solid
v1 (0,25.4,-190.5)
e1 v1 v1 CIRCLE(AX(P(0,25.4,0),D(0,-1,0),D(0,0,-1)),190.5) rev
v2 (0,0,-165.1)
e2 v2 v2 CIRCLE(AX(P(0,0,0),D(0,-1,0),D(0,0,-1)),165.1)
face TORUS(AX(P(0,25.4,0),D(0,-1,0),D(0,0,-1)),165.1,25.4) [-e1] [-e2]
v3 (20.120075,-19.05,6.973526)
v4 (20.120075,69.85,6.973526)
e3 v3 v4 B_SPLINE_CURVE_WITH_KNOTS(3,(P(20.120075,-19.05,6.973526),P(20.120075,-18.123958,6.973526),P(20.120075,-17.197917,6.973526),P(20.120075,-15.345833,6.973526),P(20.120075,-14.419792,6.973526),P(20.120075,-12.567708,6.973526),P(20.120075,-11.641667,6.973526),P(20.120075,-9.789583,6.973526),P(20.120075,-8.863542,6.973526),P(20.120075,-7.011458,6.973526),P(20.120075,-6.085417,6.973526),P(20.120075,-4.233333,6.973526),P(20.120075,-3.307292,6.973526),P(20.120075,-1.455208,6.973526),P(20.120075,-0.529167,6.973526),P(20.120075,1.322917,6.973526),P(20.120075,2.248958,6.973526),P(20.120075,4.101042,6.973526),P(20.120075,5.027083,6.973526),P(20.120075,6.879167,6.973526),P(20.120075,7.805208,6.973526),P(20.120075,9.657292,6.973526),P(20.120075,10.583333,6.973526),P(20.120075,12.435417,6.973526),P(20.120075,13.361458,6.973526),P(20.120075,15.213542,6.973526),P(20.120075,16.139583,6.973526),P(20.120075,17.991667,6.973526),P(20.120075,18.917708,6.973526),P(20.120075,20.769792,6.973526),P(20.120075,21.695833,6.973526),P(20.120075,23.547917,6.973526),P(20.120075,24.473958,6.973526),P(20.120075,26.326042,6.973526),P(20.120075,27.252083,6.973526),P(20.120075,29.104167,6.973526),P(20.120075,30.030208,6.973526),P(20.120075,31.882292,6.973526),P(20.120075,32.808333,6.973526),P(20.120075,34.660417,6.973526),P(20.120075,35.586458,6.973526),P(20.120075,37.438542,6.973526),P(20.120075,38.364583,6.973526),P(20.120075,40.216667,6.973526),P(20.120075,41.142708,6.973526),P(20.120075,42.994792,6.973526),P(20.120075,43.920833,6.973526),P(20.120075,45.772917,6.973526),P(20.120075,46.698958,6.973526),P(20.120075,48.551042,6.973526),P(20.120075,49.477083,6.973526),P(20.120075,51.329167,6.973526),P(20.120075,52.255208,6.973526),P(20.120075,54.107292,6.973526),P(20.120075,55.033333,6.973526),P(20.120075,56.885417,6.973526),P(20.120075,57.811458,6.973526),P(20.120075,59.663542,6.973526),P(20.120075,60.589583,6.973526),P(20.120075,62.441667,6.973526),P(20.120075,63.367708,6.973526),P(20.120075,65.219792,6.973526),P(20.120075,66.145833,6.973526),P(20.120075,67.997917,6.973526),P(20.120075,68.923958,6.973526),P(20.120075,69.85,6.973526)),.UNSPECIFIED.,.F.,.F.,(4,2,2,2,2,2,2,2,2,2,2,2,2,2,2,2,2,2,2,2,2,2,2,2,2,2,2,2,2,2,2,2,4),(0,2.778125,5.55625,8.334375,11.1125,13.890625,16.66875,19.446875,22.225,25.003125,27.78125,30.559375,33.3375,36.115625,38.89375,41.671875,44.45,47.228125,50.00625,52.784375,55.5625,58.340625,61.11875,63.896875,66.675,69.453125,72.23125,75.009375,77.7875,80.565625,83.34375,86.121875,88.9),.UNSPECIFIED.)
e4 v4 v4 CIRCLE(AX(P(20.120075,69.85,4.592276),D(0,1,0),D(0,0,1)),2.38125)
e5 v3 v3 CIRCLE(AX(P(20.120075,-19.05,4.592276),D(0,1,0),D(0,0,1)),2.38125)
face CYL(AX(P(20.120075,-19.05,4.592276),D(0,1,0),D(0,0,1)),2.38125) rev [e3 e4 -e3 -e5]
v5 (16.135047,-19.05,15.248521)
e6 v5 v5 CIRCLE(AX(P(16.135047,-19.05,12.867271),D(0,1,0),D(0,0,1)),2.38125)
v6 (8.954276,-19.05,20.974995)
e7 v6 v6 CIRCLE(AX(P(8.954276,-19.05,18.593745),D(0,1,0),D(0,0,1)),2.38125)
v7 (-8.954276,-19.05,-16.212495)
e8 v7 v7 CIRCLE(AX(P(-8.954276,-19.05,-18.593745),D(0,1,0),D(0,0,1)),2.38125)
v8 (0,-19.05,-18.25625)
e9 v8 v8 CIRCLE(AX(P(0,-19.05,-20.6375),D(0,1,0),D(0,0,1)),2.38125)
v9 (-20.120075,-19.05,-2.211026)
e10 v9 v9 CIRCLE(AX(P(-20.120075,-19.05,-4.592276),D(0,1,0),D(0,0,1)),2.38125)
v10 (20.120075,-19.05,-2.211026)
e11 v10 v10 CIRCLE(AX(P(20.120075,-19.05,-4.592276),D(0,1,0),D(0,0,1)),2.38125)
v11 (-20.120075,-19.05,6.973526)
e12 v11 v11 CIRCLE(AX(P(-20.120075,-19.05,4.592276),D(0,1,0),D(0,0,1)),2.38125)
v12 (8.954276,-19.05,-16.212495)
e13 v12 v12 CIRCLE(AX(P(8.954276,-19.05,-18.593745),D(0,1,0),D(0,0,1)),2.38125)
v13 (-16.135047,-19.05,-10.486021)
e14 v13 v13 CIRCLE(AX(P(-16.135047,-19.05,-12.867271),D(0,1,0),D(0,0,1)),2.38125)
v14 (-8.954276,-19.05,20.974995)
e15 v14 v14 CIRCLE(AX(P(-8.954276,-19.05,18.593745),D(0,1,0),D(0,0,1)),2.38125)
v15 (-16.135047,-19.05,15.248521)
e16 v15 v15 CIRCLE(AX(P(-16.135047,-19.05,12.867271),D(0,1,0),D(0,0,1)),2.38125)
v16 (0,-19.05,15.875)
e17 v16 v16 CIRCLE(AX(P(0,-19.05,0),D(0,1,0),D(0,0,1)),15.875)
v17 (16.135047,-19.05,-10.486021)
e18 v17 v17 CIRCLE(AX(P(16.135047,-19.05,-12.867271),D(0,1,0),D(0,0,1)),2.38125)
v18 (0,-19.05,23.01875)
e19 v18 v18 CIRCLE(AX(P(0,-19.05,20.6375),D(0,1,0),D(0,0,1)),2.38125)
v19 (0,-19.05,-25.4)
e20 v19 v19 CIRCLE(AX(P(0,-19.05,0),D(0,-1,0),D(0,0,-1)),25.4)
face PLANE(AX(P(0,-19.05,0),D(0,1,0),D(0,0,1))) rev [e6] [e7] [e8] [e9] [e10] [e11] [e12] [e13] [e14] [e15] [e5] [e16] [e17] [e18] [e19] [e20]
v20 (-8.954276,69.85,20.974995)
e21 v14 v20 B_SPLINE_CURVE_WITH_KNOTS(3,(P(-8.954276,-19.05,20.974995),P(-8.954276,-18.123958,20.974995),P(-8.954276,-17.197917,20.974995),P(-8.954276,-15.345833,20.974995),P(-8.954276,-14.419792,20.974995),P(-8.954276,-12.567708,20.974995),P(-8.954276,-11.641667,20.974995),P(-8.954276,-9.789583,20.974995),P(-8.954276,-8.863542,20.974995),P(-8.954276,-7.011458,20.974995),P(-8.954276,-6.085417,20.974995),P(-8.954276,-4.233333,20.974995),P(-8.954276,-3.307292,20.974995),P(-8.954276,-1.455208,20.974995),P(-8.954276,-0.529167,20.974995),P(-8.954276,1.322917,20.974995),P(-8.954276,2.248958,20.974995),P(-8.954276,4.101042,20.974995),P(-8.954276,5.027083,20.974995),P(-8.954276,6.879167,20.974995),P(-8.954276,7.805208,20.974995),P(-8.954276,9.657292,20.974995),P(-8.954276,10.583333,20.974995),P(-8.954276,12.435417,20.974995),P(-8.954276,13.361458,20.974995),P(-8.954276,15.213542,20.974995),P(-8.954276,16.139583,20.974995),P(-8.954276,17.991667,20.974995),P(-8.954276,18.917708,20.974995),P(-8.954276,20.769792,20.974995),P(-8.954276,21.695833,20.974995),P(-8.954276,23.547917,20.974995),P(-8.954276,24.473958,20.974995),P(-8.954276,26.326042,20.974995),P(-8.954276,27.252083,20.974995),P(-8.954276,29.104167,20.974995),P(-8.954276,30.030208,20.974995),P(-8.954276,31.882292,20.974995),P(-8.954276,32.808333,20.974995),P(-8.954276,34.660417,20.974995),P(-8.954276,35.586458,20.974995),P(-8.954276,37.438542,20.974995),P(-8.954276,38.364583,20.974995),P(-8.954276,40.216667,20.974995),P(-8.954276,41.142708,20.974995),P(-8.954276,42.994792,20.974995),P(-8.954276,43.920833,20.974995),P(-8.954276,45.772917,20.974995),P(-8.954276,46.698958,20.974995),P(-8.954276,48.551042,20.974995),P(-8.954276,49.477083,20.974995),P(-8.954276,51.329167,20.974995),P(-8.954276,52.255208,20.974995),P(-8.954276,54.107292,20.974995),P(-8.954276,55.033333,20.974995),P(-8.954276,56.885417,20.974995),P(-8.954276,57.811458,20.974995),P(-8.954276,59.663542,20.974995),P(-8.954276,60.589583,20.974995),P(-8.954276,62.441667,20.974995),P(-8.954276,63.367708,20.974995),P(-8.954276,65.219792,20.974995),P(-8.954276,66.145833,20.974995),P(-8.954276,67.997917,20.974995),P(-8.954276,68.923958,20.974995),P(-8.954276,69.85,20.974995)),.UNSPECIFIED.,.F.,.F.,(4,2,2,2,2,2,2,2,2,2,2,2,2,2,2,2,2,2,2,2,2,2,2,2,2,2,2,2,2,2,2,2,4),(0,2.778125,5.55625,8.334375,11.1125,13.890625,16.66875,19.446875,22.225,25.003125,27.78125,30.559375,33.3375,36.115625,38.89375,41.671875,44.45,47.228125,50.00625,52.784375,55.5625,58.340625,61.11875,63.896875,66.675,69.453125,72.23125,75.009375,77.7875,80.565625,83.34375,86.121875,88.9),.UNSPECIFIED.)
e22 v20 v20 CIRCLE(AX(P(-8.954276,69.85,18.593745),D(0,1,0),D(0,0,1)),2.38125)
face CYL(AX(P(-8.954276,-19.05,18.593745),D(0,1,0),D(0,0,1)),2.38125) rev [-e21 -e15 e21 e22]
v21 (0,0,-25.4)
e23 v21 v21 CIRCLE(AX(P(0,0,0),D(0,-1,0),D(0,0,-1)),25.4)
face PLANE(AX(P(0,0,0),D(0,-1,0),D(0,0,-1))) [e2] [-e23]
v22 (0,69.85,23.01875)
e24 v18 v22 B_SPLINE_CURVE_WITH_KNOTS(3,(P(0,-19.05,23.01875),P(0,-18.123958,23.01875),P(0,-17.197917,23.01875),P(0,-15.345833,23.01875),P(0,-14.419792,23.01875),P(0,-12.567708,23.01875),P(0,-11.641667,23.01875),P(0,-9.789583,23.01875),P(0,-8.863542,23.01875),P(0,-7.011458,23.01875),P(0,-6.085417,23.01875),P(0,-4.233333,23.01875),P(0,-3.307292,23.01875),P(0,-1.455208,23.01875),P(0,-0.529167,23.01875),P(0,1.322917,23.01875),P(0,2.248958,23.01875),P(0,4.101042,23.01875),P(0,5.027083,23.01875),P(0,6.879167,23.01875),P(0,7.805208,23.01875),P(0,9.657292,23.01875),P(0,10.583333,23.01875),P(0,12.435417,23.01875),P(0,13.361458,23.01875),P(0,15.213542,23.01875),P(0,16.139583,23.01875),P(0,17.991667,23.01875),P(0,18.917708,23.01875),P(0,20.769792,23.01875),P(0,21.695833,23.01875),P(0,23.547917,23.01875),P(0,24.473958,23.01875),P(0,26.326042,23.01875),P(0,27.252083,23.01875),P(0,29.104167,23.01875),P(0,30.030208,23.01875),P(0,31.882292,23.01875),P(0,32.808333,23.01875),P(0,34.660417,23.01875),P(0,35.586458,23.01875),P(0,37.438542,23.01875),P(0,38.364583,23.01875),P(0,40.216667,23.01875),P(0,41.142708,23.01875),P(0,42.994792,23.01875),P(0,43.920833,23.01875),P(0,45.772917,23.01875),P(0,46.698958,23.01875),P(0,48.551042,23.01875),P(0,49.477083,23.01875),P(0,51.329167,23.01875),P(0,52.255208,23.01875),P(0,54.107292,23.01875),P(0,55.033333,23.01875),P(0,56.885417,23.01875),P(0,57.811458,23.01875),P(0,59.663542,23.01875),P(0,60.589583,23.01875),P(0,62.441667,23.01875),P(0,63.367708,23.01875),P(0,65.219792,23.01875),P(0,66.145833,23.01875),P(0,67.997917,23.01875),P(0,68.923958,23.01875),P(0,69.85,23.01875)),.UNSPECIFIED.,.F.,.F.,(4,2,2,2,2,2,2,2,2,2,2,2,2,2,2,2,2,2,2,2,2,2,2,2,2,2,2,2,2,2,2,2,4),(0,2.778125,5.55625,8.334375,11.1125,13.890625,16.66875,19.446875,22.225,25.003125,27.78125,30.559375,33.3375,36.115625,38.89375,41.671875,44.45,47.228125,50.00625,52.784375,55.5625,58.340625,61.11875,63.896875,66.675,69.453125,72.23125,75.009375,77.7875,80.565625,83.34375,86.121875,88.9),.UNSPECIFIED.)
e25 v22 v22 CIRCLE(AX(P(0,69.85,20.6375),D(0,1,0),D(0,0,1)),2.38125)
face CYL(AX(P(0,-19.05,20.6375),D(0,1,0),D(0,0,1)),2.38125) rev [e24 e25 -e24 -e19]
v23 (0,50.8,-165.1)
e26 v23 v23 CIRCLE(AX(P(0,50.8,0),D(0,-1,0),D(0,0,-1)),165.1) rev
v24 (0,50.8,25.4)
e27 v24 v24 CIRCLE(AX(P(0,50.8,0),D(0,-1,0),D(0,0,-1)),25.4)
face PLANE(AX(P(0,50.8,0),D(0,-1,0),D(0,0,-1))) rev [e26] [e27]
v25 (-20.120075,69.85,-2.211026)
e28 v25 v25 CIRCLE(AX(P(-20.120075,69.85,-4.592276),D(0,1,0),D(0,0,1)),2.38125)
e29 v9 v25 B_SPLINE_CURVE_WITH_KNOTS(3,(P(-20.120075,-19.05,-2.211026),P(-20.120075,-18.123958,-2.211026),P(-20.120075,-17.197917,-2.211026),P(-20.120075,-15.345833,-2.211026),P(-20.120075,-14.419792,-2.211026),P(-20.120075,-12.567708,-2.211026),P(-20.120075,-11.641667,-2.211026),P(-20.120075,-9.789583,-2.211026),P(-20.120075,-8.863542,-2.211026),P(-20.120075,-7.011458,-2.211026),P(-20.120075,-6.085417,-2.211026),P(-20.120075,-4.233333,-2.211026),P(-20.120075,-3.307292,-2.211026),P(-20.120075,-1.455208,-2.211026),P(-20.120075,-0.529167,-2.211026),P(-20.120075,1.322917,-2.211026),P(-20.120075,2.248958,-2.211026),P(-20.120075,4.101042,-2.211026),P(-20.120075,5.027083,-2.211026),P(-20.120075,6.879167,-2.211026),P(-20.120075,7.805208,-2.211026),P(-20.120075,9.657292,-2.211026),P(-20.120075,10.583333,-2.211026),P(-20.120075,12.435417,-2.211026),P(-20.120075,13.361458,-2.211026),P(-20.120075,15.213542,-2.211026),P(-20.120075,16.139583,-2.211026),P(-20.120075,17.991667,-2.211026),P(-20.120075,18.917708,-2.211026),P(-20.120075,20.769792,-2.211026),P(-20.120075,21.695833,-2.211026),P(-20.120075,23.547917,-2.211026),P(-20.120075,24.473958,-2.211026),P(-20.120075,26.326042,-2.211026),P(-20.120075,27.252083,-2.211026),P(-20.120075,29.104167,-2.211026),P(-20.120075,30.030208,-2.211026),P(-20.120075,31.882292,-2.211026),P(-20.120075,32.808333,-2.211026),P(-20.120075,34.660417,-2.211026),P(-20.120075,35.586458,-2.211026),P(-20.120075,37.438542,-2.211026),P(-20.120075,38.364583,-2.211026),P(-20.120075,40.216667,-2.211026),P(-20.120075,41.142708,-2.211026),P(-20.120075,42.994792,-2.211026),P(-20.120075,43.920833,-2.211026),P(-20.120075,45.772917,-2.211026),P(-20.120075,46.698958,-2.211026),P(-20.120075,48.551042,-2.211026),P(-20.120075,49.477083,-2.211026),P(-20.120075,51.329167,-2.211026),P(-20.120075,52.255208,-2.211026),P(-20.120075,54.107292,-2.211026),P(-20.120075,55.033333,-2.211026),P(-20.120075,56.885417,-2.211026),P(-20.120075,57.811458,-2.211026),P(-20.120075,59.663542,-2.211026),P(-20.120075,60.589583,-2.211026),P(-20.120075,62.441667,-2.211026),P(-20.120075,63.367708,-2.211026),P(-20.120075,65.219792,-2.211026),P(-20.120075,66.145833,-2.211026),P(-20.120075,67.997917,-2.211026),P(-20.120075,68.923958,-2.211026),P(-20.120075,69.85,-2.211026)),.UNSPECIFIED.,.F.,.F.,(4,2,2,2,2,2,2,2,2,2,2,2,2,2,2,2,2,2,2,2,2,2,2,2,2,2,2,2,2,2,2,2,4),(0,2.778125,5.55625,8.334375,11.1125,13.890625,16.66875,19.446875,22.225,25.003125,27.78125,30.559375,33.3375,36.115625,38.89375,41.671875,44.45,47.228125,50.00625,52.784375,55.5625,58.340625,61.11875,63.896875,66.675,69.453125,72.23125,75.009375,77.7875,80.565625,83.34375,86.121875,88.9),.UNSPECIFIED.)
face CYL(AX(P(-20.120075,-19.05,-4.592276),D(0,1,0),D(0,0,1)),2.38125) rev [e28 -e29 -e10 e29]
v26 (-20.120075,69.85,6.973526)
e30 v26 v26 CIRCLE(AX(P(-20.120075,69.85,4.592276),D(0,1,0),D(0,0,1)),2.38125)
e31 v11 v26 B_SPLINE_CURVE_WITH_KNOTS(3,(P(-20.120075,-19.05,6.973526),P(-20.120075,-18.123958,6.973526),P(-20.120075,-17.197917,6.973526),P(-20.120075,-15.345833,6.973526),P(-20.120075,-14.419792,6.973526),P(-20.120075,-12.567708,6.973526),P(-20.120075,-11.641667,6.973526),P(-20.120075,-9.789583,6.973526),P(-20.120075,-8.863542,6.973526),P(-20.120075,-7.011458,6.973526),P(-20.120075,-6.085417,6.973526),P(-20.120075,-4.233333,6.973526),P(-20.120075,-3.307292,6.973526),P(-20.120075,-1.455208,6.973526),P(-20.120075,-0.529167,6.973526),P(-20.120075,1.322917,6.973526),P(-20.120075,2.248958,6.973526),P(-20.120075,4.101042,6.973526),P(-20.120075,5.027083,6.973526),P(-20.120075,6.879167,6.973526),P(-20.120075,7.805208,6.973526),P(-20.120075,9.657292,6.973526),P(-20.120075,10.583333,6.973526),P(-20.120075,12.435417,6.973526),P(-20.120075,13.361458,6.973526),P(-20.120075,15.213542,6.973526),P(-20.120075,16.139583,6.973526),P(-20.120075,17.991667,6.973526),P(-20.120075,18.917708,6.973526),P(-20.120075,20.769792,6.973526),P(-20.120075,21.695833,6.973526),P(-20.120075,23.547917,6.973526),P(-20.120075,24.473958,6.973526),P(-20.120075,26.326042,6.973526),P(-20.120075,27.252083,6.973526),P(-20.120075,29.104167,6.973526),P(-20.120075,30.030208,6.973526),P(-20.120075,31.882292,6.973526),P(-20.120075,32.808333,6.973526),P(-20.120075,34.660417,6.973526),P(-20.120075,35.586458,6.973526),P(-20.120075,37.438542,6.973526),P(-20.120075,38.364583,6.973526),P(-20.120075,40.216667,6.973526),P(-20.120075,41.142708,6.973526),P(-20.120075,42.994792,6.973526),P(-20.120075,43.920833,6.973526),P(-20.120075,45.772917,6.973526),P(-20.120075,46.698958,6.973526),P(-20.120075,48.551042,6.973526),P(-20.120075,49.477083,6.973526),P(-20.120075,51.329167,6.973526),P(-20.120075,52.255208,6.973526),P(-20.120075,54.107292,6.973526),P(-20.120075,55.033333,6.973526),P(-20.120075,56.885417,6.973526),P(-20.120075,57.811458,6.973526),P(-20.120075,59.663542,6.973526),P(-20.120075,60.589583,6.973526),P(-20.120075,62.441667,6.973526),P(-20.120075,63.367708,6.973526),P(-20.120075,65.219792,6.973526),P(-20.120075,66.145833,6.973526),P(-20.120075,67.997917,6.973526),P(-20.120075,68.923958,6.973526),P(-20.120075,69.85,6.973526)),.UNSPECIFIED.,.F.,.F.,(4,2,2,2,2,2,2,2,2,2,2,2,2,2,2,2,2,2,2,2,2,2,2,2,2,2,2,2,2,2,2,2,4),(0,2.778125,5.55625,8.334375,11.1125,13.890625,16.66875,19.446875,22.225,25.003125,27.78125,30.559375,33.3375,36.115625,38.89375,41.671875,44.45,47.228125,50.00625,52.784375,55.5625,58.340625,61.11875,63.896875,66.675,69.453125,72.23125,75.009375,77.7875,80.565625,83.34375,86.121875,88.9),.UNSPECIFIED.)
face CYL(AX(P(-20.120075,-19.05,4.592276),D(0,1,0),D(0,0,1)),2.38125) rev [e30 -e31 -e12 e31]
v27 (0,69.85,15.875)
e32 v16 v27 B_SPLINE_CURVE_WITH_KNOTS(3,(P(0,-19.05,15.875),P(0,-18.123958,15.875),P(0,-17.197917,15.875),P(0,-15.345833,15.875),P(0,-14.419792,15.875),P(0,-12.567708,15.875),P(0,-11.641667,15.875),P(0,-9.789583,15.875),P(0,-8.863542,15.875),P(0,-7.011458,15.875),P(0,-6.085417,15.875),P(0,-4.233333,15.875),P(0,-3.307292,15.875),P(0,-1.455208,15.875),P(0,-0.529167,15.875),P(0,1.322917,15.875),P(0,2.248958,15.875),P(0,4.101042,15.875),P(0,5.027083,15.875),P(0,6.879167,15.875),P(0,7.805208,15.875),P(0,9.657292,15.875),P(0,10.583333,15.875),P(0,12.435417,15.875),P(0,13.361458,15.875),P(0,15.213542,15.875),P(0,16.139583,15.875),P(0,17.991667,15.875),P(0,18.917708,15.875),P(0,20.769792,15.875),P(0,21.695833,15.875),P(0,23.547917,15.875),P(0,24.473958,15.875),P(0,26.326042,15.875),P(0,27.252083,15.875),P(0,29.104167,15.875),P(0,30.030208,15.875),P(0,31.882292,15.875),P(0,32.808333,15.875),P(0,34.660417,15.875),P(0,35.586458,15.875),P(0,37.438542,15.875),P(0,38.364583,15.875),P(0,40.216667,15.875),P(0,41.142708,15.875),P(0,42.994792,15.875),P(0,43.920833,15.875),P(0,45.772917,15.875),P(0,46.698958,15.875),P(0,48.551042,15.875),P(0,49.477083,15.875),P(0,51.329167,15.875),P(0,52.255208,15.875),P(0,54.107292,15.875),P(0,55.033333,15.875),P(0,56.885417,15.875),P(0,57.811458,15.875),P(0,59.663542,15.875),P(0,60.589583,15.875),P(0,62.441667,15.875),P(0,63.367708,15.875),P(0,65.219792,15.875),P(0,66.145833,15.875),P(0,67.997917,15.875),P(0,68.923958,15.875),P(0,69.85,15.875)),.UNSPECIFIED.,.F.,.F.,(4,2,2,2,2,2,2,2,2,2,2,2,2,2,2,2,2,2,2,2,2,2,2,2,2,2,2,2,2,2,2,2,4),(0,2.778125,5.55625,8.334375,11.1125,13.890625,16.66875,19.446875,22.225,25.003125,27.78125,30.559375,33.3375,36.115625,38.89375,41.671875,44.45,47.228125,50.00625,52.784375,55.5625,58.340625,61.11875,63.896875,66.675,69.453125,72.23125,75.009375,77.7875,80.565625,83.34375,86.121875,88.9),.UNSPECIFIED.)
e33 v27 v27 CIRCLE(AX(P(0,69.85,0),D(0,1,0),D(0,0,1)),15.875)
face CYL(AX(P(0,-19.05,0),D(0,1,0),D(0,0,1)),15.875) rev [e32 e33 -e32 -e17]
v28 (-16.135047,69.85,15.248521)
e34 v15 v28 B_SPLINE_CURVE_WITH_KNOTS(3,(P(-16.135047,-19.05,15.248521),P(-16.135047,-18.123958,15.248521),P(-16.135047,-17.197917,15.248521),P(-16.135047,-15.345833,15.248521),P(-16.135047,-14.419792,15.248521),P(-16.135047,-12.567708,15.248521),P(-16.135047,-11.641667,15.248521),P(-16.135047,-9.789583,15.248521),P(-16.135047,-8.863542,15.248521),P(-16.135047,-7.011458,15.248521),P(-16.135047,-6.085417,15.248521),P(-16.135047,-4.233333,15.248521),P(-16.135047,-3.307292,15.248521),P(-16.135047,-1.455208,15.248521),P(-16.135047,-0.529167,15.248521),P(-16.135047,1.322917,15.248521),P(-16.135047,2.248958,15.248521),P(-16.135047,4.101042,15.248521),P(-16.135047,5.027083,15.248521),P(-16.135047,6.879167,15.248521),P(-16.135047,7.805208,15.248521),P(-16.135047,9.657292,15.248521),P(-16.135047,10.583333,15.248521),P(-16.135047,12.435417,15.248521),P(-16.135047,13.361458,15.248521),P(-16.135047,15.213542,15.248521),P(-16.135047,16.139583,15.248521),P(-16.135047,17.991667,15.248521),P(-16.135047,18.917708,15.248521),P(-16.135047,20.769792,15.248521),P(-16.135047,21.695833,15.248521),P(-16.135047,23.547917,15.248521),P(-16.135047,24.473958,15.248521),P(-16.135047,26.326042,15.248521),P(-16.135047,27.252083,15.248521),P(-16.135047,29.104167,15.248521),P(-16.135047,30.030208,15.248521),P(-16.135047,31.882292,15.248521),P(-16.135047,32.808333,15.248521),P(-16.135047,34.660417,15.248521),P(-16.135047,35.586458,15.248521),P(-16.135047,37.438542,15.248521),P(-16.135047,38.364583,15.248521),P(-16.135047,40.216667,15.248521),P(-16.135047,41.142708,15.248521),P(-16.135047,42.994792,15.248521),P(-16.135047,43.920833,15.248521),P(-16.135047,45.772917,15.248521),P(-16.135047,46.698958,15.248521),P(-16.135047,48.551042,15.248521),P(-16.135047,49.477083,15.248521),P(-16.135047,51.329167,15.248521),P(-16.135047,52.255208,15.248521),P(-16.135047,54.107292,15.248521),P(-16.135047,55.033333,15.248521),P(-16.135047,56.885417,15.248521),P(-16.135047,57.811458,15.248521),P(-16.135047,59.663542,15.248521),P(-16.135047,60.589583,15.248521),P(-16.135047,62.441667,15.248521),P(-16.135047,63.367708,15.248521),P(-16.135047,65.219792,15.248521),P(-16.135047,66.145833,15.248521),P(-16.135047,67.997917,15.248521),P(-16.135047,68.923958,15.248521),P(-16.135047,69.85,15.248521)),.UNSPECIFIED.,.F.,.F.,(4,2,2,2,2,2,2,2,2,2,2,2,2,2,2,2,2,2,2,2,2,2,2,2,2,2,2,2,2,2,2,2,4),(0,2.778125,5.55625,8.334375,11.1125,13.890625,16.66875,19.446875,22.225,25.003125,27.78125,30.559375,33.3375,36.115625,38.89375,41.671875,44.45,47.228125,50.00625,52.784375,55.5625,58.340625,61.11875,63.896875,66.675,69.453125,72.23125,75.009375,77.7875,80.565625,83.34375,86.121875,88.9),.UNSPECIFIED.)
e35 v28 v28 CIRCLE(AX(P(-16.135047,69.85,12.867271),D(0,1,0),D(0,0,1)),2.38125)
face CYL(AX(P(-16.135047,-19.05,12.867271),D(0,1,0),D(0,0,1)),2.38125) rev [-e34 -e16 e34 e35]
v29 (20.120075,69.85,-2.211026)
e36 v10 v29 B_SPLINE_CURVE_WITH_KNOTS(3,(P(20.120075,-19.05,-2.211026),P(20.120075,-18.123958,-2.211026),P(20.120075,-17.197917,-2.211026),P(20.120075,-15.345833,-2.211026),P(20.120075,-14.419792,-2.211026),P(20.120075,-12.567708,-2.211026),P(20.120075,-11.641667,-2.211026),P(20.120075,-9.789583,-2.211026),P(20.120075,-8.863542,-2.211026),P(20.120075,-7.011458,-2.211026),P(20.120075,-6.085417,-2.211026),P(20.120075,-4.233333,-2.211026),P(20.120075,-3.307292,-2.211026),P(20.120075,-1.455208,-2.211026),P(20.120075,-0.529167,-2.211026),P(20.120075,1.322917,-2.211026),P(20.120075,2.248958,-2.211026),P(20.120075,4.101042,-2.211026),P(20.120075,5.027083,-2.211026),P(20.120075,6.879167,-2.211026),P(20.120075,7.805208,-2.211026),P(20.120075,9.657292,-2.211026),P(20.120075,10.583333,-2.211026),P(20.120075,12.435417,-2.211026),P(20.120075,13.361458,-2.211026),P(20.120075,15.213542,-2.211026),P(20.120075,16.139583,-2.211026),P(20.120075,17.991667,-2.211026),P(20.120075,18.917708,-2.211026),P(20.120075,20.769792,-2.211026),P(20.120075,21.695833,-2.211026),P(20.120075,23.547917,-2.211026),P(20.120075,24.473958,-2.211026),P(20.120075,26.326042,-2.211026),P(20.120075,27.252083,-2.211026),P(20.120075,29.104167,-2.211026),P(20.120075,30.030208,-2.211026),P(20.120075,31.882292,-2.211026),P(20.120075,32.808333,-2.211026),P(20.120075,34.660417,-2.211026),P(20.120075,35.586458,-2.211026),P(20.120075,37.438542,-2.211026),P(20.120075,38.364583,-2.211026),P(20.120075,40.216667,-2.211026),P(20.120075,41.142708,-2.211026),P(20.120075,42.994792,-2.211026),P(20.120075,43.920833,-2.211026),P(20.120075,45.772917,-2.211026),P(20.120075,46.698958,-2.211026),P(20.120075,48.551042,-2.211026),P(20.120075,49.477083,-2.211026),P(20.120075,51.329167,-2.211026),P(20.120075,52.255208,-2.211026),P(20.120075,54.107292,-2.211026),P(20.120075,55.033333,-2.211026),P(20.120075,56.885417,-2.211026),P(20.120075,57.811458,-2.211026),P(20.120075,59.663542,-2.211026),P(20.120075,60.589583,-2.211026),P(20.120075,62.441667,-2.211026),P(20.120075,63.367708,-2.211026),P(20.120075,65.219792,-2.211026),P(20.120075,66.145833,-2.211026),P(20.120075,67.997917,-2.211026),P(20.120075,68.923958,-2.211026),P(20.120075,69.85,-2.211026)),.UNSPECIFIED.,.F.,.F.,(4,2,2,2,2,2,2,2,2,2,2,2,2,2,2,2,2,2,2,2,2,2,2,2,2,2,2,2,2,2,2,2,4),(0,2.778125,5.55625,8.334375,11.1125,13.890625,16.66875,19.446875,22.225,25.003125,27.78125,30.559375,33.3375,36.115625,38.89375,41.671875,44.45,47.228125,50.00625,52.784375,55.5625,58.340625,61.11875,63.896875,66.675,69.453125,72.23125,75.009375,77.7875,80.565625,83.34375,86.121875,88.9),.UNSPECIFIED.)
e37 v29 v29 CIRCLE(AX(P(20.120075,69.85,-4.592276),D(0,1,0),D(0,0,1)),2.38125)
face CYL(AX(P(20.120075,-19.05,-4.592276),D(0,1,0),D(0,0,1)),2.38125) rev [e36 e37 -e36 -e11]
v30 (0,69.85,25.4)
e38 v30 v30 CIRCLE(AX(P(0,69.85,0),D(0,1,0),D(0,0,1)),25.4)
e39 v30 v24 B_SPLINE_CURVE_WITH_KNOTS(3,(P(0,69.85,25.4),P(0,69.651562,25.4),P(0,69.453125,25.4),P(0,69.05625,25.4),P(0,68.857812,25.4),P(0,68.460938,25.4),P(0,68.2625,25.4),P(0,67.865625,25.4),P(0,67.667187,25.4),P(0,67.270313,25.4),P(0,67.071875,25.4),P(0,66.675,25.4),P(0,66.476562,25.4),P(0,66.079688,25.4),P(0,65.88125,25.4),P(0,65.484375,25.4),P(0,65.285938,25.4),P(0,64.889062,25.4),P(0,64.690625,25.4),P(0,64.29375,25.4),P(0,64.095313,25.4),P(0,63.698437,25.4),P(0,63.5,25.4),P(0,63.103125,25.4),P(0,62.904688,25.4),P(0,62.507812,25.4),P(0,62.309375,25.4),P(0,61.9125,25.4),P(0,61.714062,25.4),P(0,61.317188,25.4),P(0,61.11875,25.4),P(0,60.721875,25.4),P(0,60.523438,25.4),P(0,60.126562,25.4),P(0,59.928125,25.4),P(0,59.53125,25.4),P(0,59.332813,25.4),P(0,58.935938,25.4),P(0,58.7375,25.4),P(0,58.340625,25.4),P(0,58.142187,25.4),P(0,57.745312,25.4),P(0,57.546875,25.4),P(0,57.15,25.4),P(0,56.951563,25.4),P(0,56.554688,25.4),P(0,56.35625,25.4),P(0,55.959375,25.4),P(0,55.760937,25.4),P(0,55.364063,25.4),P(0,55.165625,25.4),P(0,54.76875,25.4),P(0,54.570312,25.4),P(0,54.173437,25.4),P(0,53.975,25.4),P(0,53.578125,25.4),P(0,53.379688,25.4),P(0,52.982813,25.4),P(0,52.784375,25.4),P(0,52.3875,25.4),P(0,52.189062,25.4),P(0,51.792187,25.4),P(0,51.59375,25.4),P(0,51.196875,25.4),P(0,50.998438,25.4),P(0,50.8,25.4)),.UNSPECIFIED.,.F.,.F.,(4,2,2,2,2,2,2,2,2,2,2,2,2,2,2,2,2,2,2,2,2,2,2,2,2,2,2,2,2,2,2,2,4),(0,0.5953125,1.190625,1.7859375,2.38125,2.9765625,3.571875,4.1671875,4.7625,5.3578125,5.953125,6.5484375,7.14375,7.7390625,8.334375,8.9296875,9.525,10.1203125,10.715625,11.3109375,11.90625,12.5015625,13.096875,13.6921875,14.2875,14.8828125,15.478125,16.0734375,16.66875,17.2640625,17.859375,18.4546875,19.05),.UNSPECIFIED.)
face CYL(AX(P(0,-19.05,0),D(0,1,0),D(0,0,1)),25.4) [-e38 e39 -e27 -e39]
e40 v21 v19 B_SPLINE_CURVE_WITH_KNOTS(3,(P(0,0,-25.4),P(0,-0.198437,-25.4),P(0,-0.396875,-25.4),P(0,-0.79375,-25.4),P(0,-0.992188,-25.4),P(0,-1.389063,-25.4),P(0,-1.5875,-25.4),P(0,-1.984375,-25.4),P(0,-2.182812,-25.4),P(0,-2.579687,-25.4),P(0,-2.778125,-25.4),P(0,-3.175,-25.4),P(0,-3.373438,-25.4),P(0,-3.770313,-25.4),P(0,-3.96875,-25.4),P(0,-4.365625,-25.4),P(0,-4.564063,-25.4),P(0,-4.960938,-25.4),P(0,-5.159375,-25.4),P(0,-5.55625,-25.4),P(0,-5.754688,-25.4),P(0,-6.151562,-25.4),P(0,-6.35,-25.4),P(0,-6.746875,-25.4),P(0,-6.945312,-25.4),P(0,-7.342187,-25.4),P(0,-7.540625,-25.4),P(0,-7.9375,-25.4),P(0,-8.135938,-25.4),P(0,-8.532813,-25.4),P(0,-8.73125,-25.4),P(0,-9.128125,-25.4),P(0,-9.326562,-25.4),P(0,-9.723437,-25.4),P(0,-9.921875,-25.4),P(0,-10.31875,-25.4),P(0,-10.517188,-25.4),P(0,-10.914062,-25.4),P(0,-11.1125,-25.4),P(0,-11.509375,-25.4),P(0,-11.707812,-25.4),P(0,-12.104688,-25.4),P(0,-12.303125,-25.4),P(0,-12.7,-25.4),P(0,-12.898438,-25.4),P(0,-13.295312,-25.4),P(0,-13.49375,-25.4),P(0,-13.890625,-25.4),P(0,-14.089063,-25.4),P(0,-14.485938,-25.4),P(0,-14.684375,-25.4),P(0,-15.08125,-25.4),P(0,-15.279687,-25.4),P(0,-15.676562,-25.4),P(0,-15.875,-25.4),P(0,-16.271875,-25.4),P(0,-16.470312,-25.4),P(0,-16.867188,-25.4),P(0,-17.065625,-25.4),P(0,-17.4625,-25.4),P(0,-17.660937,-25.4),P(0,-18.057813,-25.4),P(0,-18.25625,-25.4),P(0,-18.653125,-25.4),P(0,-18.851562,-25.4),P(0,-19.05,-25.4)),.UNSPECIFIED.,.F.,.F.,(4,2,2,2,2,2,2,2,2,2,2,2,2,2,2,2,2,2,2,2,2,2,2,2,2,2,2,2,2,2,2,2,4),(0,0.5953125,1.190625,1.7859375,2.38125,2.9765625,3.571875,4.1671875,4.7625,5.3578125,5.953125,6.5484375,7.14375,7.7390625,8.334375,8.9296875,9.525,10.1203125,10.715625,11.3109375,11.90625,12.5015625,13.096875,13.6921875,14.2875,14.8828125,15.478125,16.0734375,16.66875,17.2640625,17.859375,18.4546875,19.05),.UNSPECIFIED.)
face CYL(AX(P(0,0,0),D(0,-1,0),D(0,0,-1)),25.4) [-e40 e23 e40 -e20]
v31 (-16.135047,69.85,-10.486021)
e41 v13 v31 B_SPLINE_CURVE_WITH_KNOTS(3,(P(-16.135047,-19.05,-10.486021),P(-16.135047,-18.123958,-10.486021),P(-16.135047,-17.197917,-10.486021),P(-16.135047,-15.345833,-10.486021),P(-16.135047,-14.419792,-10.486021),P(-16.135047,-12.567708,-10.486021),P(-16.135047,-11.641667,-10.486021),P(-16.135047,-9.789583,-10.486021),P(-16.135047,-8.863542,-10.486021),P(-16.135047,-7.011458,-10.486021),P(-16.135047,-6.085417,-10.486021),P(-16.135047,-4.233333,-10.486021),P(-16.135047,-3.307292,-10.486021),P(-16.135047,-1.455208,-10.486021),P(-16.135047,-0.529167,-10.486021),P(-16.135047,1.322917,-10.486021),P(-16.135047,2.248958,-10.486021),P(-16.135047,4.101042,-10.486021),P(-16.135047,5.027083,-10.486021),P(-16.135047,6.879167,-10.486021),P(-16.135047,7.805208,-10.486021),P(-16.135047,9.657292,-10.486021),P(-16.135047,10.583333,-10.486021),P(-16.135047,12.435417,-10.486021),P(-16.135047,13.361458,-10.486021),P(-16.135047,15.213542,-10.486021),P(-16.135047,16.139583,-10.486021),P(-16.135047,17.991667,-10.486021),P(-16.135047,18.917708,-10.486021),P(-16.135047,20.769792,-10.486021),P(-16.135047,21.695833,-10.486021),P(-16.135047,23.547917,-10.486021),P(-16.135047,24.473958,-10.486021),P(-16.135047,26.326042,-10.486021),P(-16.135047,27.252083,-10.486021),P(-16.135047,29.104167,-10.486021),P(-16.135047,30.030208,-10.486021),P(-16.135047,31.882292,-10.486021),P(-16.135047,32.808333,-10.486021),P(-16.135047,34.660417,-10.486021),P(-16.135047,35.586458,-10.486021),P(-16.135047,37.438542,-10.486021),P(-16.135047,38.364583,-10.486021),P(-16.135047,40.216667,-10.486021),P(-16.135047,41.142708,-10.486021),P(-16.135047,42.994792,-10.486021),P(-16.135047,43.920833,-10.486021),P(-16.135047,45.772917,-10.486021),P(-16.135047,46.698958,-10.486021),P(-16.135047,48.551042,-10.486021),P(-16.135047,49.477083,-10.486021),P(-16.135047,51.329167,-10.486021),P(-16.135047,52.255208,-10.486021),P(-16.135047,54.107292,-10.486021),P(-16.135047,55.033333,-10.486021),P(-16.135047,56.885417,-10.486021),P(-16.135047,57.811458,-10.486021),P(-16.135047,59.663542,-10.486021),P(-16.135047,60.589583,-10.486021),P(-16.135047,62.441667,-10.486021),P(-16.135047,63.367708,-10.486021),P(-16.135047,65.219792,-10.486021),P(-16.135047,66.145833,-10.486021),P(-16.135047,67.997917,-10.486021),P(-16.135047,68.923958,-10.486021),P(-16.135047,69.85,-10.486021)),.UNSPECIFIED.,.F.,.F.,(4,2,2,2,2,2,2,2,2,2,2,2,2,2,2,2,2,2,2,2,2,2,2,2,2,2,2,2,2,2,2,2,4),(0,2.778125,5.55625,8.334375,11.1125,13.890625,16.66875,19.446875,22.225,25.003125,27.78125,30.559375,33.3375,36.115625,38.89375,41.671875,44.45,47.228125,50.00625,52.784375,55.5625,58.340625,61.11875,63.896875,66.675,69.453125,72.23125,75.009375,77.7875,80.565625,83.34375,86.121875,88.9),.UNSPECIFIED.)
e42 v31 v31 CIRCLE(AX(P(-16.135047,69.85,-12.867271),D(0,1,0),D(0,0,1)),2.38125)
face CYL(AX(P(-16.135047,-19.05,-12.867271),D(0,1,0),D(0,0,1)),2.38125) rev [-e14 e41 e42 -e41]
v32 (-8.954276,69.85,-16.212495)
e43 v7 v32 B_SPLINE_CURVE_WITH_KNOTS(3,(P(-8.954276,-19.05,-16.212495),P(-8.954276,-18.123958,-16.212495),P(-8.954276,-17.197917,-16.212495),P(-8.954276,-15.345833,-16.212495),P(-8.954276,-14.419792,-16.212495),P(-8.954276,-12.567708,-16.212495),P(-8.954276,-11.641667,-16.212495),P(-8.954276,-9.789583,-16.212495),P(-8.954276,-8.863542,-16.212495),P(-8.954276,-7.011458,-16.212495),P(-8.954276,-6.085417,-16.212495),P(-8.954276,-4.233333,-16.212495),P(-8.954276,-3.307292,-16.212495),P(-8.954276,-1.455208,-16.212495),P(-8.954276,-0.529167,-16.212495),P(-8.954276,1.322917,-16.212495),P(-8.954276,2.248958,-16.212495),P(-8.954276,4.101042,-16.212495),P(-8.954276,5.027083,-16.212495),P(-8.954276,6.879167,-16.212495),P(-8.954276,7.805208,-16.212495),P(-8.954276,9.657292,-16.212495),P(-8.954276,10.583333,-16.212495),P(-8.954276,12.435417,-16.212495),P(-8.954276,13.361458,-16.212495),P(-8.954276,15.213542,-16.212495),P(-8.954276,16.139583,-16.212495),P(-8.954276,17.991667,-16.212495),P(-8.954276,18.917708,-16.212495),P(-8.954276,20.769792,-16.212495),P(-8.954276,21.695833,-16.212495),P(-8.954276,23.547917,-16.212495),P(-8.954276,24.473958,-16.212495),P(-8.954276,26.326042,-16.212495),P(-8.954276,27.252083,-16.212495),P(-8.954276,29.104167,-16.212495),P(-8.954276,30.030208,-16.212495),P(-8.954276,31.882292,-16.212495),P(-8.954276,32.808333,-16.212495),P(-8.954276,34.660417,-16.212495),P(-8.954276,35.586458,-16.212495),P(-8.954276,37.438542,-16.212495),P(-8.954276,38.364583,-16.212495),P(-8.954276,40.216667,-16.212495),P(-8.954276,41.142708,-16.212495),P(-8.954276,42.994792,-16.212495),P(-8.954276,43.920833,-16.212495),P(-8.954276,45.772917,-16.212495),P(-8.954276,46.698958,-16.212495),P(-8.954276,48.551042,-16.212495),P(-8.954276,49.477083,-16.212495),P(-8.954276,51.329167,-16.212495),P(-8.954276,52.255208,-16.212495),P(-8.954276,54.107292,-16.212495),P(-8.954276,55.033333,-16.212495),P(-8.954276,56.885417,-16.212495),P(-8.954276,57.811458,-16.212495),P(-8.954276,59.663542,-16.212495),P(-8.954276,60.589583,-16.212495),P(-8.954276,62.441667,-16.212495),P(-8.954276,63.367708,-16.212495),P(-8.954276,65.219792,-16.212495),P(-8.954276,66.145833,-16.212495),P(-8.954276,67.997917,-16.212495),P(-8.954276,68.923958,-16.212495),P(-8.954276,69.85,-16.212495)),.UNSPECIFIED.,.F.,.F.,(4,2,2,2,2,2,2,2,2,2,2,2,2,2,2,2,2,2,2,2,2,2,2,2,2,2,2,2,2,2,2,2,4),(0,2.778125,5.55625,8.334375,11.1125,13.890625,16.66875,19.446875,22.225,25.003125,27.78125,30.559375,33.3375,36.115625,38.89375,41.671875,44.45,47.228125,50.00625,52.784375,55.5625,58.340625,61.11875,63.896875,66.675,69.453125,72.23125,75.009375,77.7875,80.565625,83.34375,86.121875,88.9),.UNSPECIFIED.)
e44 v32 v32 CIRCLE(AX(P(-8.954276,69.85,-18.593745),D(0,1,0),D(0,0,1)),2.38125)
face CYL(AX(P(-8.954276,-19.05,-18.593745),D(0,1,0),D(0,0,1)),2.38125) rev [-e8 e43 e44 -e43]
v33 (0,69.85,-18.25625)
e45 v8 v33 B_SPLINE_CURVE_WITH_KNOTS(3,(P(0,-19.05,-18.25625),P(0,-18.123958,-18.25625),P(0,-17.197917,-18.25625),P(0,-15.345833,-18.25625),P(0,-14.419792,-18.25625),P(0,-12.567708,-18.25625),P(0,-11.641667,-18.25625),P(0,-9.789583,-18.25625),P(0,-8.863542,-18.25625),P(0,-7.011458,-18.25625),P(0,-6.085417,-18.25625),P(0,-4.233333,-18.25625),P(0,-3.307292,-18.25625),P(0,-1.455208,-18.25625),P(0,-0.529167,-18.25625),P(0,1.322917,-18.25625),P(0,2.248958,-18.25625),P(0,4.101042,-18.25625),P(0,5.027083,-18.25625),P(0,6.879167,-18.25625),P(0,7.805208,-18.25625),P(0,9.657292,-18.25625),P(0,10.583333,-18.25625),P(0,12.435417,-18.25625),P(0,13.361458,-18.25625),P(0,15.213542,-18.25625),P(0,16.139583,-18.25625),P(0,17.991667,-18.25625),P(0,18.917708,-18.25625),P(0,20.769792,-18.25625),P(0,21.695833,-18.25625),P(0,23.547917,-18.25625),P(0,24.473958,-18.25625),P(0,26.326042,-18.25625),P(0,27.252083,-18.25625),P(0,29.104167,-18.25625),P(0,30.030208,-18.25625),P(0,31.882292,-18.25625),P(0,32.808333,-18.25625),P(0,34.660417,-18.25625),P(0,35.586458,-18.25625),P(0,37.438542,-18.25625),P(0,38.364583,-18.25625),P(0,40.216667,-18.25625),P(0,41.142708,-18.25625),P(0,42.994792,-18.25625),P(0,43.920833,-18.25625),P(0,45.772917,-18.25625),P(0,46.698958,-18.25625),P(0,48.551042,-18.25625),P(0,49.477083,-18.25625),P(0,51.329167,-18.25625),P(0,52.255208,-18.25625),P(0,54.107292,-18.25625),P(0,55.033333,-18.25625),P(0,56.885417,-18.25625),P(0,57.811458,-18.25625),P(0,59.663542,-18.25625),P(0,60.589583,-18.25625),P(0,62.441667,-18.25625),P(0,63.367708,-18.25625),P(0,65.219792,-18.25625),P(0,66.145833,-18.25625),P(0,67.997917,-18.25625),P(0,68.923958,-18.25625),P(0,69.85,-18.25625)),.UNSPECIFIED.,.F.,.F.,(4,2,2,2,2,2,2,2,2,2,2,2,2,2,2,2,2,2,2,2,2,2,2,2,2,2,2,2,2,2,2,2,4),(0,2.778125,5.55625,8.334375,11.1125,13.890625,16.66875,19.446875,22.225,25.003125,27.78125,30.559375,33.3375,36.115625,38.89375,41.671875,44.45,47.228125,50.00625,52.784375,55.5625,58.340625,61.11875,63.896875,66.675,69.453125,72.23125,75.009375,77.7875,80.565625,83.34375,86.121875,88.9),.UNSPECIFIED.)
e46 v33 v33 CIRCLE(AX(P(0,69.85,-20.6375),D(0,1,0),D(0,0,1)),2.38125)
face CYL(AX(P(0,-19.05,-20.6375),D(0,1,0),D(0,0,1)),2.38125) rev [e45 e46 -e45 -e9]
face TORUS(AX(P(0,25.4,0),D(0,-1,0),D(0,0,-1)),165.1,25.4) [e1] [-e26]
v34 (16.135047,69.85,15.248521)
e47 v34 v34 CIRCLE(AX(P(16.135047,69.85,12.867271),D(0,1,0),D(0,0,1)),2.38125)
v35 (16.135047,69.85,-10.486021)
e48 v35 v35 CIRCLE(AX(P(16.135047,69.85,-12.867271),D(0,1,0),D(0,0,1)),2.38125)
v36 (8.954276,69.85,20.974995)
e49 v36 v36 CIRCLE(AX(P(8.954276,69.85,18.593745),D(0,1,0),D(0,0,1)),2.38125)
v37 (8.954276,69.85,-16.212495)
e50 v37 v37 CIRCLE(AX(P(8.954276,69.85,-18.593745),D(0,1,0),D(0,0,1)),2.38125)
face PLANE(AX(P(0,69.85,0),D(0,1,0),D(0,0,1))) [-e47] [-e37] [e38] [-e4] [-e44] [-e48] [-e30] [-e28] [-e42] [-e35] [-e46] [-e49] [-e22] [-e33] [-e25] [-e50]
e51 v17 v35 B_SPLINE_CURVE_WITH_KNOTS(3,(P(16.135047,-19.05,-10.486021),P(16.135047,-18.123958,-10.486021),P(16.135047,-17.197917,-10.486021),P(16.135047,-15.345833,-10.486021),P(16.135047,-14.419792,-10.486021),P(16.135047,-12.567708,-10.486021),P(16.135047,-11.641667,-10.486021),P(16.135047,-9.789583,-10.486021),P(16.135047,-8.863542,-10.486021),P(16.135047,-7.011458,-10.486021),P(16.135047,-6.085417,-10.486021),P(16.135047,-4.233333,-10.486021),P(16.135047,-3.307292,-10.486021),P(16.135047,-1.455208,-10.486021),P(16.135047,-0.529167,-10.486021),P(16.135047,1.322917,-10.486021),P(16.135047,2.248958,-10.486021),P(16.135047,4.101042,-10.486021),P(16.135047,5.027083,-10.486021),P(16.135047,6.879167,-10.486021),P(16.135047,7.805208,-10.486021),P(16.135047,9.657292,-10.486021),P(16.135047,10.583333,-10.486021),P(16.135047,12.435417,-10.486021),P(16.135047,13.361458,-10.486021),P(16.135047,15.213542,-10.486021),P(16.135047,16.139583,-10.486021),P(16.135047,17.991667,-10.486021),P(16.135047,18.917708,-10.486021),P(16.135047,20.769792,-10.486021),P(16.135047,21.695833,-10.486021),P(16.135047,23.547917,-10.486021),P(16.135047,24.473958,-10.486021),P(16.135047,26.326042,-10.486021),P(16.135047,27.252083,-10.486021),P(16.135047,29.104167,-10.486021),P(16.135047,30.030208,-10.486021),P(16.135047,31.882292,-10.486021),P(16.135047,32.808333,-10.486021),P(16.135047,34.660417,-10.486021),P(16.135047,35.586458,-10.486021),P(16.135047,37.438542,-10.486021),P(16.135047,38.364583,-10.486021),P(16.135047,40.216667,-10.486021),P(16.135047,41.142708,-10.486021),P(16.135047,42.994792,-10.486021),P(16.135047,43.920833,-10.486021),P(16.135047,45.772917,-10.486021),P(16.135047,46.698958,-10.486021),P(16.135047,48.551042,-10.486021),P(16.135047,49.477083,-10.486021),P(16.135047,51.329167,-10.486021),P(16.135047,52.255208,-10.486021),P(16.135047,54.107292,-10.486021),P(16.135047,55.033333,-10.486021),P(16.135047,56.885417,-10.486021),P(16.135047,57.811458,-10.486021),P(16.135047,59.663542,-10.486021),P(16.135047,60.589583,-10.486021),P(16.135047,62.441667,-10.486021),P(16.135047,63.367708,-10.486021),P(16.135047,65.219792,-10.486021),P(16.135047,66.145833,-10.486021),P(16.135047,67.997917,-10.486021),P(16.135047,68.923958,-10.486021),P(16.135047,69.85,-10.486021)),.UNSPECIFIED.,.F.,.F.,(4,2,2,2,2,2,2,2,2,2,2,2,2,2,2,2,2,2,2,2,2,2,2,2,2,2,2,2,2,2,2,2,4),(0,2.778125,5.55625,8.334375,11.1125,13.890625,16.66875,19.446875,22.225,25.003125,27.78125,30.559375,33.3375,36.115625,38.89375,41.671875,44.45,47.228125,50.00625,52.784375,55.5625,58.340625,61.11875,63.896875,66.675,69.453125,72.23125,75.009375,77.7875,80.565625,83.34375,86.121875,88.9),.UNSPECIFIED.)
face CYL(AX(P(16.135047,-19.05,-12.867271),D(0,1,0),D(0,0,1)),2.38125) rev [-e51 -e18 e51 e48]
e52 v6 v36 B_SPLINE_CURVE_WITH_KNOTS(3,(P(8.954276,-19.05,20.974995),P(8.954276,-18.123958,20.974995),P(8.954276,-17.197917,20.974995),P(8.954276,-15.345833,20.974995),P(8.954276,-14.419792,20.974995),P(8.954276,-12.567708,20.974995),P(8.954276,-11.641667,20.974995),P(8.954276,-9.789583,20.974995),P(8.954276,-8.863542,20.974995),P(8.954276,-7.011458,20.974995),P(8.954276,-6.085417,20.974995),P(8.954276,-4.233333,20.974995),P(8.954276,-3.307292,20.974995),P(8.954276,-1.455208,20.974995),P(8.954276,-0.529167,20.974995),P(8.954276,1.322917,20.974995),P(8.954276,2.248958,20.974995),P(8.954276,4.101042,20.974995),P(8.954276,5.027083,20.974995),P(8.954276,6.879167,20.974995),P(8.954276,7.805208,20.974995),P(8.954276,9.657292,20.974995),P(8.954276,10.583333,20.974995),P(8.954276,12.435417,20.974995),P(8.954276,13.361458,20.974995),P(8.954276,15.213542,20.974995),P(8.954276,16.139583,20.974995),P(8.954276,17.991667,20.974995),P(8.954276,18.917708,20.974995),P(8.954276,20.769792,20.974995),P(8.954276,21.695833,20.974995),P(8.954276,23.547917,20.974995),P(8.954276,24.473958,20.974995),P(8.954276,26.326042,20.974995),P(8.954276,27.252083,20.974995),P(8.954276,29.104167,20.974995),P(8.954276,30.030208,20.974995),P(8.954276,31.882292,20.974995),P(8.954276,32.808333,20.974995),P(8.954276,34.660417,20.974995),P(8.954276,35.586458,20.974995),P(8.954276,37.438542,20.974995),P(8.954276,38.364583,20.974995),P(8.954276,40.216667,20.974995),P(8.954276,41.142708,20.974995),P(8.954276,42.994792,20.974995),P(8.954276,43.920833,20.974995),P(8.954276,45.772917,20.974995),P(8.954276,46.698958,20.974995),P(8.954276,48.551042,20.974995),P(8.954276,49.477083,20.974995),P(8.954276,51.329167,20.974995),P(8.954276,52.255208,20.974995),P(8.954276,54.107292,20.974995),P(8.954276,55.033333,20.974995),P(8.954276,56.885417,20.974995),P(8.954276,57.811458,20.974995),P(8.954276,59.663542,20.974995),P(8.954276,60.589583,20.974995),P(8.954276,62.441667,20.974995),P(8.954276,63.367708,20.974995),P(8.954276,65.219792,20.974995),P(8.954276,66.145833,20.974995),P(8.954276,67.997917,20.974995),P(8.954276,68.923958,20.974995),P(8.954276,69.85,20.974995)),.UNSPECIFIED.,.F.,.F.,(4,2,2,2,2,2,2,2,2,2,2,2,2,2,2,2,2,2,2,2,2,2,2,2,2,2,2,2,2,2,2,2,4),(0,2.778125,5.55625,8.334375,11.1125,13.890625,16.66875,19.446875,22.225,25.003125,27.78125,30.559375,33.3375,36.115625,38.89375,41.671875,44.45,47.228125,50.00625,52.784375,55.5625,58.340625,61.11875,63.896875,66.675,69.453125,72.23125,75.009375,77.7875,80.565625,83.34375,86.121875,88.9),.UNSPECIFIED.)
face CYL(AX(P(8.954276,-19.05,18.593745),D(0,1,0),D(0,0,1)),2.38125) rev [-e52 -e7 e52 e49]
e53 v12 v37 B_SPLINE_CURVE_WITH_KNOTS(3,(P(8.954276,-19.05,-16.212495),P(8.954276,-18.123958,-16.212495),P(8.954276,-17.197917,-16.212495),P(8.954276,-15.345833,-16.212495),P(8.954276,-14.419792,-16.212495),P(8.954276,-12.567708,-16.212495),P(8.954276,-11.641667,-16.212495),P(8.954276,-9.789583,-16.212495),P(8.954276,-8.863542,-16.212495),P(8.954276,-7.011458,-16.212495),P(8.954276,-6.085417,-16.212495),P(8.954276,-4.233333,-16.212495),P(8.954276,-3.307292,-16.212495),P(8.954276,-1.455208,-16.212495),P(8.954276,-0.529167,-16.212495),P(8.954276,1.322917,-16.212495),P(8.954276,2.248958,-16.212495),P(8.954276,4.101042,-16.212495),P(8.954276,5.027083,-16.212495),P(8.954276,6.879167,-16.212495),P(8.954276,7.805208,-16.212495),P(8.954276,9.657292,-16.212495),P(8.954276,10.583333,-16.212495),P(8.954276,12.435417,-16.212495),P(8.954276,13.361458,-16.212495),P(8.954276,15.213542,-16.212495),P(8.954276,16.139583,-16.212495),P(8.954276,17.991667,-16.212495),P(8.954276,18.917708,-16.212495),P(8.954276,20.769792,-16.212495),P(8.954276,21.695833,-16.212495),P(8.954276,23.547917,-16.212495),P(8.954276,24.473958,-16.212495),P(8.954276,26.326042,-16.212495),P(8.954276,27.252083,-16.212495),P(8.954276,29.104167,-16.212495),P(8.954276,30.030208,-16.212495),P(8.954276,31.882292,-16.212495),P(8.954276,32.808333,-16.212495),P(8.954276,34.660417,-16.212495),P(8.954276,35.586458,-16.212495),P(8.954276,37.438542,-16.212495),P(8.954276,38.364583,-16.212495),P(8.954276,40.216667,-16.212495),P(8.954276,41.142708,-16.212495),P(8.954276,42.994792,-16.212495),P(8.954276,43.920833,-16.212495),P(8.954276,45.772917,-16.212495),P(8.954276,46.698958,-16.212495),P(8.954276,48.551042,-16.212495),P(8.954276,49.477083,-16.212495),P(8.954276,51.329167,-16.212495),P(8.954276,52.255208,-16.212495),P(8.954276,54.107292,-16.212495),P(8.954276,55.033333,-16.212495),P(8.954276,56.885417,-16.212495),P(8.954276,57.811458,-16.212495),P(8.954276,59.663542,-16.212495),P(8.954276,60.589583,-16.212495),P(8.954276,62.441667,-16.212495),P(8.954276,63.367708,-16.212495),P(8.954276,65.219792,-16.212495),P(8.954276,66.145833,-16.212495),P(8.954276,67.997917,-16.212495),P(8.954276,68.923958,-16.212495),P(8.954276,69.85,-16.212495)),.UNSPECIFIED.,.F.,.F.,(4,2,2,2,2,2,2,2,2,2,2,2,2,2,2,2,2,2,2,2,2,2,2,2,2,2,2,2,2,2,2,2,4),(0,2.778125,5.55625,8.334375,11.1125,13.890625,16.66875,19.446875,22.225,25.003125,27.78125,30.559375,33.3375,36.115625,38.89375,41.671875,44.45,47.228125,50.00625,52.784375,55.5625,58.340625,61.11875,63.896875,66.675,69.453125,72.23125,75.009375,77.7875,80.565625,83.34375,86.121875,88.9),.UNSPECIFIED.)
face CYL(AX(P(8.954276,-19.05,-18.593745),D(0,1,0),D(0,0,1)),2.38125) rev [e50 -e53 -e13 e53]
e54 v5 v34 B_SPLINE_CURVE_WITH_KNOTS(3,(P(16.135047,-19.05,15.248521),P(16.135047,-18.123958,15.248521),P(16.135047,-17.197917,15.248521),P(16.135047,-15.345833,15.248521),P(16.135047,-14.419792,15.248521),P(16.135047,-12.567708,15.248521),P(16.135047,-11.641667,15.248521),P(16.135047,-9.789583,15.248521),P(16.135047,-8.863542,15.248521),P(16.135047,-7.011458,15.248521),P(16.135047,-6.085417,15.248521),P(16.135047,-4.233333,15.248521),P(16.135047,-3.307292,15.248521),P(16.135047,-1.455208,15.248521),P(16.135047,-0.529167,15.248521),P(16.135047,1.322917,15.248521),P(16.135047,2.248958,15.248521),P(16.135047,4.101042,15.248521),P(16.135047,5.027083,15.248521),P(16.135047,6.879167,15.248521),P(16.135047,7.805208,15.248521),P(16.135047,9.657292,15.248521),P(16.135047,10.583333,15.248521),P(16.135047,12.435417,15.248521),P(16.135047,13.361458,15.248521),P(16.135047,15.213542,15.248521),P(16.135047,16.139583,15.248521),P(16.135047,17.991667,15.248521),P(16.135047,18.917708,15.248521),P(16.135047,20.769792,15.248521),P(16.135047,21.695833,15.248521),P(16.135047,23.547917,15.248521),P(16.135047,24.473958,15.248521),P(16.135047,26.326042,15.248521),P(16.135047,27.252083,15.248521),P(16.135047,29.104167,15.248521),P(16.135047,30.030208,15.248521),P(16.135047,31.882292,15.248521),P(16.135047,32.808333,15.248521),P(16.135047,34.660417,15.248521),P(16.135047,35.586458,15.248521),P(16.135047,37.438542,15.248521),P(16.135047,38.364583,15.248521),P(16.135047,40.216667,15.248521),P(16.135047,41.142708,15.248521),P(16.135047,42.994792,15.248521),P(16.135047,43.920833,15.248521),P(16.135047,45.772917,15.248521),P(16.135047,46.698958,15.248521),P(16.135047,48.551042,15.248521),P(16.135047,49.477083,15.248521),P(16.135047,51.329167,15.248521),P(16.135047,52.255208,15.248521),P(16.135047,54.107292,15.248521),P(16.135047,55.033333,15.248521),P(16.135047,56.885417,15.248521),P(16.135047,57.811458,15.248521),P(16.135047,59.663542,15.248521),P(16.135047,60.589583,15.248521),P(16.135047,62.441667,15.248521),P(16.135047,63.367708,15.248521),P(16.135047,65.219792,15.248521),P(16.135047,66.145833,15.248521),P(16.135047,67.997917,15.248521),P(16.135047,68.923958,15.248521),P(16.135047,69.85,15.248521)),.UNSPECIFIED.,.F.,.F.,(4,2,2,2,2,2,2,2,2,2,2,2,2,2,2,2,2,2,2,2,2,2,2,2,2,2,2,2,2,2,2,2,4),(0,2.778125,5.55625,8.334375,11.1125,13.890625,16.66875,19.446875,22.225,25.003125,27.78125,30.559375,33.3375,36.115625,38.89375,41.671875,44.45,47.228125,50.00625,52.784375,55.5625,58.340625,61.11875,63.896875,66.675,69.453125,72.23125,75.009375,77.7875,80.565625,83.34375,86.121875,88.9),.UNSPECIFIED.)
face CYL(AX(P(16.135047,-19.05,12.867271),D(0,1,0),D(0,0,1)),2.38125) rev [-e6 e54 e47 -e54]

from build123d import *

# Parameters (mm, degrees)
BOSS_EXTRUDE5_DEPTH      = 69.85
BOSS_EXTRUDE5_DEPTH_BACK = 19.05
SKETCH1_R                = 25.4
SKETCH1_R_2              = 2.38125
SKETCH1_R_3              = 15.875
SKETCH2_R                = 190.5
SKETCH2_R_2              = 25.4
BOSS_EXTRUDE7_DEPTH      = 69.85
SKETCH4_R                = 190.5
SKETCH4_R_2              = 25.4
CUT_EXTRUDE2_DEPTH       = 19.05
FILLET1_R                = 25.4


with BuildPart() as part:
    # Sketch1 → Boss-Extrude5 (new, two sides: drawn at the far end of the back side and taken through both)
    with BuildSketch(Plane(origin=(0, 0, 0), x_dir=(1, 0, 0), z_dir=(0, 1, 0)).offset(-BOSS_EXTRUDE5_DEPTH_BACK)):
        with Locations(Location((0, 0, 0), (0, 0, 270))):
            Circle(SKETCH1_R)
        with Locations(Location((-8.954275666, 18.593745011, 0), (0, 0, 270))):
            Circle(SKETCH1_R_2, mode=Mode.SUBTRACT)
        with Locations(Location((-16.135047219, 12.867270786, 0), (0, 0, 270))):
            Circle(SKETCH1_R_2, mode=Mode.SUBTRACT)
        with Locations(Location((-20.120074788, 4.592275775, 0), (0, 0, 270))):
            Circle(SKETCH1_R_2, mode=Mode.SUBTRACT)
        with Locations(Location((-20.120074788, -4.592275775, 0), (0, 0, 270))):
            Circle(SKETCH1_R_2, mode=Mode.SUBTRACT)
        with Locations(Location((-16.135047219, -12.867270786, 0), (0, 0, 270))):
            Circle(SKETCH1_R_2, mode=Mode.SUBTRACT)
        with Locations(Location((-8.954275666, -18.593745011, 0), (0, 0, 270))):
            Circle(SKETCH1_R_2, mode=Mode.SUBTRACT)
        with Locations(Location((0, -20.6375, 0), (0, 0, 270))):
            Circle(SKETCH1_R_2, mode=Mode.SUBTRACT)
        with Locations(Location((8.954275666, -18.593745011, 0), (0, 0, 270))):
            Circle(SKETCH1_R_2, mode=Mode.SUBTRACT)
        with Locations(Location((16.135047219, -12.867270786, 0), (0, 0, 270))):
            Circle(SKETCH1_R_2, mode=Mode.SUBTRACT)
        with Locations(Location((20.120074788, -4.592275775, 0), (0, 0, 270))):
            Circle(SKETCH1_R_2, mode=Mode.SUBTRACT)
        with Locations(Location((20.120074788, 4.592275775, 0), (0, 0, 270))):
            Circle(SKETCH1_R_2, mode=Mode.SUBTRACT)
        with Locations(Location((16.135047219, 12.867270786, 0), (0, 0, 270))):
            Circle(SKETCH1_R_2, mode=Mode.SUBTRACT)
        with Locations(Location((8.954275666, 18.593745011, 0), (0, 0, 270))):
            Circle(SKETCH1_R_2, mode=Mode.SUBTRACT)
        with Locations(Location((0, 20.6375, 0), (0, 0, 270))):
            Circle(SKETCH1_R_2, mode=Mode.SUBTRACT)
        with Locations(Location((0, 0, 0), (0, 0, 270))):
            Circle(SKETCH1_R_3, mode=Mode.SUBTRACT)
    extrude(amount=BOSS_EXTRUDE5_DEPTH + BOSS_EXTRUDE5_DEPTH_BACK)

    # Sketch2 → Boss-Extrude7 (add)
    with BuildSketch(Plane(origin=(0, -19.05, 0), x_dir=(-1, 0, 0), z_dir=(0, -1, 0))):
        with Locations(Location((0, 0, 0), (0, 0, 90))):
            Circle(SKETCH2_R)
        with Locations(Location((0, 0, 0), (0, 0, 270))):
            Circle(SKETCH2_R_2, mode=Mode.SUBTRACT)
    extrude(amount=-BOSS_EXTRUDE7_DEPTH)

    # Sketch4 → Cut-Extrude2 (cut)
    with BuildSketch(Plane(origin=(0, -19.05, 0), x_dir=(-1, 0, 0), z_dir=(0, -1, 0))):
        with Locations(Location((0, 0, 0), (0, 0, 90))):
            Circle(SKETCH4_R)
        with Locations(Location((0, 0, 0), (0, 0, 270))):
            Circle(SKETCH4_R_2, mode=Mode.SUBTRACT)
    extrude(amount=-CUT_EXTRUDE2_DEPTH, mode=Mode.SUBTRACT)

    # Fillet1
    fillet1_edges = [part.edges().sort_by_distance(p)[0] for p in [
        (0, 50.8, 190.5),
        (0, 0, 190.5),
    ]]
    fillet(fillet1_edges, radius=FILLET1_R - 0.0001)  # a hair under: the kernel refuses the full size


solid = part.part
